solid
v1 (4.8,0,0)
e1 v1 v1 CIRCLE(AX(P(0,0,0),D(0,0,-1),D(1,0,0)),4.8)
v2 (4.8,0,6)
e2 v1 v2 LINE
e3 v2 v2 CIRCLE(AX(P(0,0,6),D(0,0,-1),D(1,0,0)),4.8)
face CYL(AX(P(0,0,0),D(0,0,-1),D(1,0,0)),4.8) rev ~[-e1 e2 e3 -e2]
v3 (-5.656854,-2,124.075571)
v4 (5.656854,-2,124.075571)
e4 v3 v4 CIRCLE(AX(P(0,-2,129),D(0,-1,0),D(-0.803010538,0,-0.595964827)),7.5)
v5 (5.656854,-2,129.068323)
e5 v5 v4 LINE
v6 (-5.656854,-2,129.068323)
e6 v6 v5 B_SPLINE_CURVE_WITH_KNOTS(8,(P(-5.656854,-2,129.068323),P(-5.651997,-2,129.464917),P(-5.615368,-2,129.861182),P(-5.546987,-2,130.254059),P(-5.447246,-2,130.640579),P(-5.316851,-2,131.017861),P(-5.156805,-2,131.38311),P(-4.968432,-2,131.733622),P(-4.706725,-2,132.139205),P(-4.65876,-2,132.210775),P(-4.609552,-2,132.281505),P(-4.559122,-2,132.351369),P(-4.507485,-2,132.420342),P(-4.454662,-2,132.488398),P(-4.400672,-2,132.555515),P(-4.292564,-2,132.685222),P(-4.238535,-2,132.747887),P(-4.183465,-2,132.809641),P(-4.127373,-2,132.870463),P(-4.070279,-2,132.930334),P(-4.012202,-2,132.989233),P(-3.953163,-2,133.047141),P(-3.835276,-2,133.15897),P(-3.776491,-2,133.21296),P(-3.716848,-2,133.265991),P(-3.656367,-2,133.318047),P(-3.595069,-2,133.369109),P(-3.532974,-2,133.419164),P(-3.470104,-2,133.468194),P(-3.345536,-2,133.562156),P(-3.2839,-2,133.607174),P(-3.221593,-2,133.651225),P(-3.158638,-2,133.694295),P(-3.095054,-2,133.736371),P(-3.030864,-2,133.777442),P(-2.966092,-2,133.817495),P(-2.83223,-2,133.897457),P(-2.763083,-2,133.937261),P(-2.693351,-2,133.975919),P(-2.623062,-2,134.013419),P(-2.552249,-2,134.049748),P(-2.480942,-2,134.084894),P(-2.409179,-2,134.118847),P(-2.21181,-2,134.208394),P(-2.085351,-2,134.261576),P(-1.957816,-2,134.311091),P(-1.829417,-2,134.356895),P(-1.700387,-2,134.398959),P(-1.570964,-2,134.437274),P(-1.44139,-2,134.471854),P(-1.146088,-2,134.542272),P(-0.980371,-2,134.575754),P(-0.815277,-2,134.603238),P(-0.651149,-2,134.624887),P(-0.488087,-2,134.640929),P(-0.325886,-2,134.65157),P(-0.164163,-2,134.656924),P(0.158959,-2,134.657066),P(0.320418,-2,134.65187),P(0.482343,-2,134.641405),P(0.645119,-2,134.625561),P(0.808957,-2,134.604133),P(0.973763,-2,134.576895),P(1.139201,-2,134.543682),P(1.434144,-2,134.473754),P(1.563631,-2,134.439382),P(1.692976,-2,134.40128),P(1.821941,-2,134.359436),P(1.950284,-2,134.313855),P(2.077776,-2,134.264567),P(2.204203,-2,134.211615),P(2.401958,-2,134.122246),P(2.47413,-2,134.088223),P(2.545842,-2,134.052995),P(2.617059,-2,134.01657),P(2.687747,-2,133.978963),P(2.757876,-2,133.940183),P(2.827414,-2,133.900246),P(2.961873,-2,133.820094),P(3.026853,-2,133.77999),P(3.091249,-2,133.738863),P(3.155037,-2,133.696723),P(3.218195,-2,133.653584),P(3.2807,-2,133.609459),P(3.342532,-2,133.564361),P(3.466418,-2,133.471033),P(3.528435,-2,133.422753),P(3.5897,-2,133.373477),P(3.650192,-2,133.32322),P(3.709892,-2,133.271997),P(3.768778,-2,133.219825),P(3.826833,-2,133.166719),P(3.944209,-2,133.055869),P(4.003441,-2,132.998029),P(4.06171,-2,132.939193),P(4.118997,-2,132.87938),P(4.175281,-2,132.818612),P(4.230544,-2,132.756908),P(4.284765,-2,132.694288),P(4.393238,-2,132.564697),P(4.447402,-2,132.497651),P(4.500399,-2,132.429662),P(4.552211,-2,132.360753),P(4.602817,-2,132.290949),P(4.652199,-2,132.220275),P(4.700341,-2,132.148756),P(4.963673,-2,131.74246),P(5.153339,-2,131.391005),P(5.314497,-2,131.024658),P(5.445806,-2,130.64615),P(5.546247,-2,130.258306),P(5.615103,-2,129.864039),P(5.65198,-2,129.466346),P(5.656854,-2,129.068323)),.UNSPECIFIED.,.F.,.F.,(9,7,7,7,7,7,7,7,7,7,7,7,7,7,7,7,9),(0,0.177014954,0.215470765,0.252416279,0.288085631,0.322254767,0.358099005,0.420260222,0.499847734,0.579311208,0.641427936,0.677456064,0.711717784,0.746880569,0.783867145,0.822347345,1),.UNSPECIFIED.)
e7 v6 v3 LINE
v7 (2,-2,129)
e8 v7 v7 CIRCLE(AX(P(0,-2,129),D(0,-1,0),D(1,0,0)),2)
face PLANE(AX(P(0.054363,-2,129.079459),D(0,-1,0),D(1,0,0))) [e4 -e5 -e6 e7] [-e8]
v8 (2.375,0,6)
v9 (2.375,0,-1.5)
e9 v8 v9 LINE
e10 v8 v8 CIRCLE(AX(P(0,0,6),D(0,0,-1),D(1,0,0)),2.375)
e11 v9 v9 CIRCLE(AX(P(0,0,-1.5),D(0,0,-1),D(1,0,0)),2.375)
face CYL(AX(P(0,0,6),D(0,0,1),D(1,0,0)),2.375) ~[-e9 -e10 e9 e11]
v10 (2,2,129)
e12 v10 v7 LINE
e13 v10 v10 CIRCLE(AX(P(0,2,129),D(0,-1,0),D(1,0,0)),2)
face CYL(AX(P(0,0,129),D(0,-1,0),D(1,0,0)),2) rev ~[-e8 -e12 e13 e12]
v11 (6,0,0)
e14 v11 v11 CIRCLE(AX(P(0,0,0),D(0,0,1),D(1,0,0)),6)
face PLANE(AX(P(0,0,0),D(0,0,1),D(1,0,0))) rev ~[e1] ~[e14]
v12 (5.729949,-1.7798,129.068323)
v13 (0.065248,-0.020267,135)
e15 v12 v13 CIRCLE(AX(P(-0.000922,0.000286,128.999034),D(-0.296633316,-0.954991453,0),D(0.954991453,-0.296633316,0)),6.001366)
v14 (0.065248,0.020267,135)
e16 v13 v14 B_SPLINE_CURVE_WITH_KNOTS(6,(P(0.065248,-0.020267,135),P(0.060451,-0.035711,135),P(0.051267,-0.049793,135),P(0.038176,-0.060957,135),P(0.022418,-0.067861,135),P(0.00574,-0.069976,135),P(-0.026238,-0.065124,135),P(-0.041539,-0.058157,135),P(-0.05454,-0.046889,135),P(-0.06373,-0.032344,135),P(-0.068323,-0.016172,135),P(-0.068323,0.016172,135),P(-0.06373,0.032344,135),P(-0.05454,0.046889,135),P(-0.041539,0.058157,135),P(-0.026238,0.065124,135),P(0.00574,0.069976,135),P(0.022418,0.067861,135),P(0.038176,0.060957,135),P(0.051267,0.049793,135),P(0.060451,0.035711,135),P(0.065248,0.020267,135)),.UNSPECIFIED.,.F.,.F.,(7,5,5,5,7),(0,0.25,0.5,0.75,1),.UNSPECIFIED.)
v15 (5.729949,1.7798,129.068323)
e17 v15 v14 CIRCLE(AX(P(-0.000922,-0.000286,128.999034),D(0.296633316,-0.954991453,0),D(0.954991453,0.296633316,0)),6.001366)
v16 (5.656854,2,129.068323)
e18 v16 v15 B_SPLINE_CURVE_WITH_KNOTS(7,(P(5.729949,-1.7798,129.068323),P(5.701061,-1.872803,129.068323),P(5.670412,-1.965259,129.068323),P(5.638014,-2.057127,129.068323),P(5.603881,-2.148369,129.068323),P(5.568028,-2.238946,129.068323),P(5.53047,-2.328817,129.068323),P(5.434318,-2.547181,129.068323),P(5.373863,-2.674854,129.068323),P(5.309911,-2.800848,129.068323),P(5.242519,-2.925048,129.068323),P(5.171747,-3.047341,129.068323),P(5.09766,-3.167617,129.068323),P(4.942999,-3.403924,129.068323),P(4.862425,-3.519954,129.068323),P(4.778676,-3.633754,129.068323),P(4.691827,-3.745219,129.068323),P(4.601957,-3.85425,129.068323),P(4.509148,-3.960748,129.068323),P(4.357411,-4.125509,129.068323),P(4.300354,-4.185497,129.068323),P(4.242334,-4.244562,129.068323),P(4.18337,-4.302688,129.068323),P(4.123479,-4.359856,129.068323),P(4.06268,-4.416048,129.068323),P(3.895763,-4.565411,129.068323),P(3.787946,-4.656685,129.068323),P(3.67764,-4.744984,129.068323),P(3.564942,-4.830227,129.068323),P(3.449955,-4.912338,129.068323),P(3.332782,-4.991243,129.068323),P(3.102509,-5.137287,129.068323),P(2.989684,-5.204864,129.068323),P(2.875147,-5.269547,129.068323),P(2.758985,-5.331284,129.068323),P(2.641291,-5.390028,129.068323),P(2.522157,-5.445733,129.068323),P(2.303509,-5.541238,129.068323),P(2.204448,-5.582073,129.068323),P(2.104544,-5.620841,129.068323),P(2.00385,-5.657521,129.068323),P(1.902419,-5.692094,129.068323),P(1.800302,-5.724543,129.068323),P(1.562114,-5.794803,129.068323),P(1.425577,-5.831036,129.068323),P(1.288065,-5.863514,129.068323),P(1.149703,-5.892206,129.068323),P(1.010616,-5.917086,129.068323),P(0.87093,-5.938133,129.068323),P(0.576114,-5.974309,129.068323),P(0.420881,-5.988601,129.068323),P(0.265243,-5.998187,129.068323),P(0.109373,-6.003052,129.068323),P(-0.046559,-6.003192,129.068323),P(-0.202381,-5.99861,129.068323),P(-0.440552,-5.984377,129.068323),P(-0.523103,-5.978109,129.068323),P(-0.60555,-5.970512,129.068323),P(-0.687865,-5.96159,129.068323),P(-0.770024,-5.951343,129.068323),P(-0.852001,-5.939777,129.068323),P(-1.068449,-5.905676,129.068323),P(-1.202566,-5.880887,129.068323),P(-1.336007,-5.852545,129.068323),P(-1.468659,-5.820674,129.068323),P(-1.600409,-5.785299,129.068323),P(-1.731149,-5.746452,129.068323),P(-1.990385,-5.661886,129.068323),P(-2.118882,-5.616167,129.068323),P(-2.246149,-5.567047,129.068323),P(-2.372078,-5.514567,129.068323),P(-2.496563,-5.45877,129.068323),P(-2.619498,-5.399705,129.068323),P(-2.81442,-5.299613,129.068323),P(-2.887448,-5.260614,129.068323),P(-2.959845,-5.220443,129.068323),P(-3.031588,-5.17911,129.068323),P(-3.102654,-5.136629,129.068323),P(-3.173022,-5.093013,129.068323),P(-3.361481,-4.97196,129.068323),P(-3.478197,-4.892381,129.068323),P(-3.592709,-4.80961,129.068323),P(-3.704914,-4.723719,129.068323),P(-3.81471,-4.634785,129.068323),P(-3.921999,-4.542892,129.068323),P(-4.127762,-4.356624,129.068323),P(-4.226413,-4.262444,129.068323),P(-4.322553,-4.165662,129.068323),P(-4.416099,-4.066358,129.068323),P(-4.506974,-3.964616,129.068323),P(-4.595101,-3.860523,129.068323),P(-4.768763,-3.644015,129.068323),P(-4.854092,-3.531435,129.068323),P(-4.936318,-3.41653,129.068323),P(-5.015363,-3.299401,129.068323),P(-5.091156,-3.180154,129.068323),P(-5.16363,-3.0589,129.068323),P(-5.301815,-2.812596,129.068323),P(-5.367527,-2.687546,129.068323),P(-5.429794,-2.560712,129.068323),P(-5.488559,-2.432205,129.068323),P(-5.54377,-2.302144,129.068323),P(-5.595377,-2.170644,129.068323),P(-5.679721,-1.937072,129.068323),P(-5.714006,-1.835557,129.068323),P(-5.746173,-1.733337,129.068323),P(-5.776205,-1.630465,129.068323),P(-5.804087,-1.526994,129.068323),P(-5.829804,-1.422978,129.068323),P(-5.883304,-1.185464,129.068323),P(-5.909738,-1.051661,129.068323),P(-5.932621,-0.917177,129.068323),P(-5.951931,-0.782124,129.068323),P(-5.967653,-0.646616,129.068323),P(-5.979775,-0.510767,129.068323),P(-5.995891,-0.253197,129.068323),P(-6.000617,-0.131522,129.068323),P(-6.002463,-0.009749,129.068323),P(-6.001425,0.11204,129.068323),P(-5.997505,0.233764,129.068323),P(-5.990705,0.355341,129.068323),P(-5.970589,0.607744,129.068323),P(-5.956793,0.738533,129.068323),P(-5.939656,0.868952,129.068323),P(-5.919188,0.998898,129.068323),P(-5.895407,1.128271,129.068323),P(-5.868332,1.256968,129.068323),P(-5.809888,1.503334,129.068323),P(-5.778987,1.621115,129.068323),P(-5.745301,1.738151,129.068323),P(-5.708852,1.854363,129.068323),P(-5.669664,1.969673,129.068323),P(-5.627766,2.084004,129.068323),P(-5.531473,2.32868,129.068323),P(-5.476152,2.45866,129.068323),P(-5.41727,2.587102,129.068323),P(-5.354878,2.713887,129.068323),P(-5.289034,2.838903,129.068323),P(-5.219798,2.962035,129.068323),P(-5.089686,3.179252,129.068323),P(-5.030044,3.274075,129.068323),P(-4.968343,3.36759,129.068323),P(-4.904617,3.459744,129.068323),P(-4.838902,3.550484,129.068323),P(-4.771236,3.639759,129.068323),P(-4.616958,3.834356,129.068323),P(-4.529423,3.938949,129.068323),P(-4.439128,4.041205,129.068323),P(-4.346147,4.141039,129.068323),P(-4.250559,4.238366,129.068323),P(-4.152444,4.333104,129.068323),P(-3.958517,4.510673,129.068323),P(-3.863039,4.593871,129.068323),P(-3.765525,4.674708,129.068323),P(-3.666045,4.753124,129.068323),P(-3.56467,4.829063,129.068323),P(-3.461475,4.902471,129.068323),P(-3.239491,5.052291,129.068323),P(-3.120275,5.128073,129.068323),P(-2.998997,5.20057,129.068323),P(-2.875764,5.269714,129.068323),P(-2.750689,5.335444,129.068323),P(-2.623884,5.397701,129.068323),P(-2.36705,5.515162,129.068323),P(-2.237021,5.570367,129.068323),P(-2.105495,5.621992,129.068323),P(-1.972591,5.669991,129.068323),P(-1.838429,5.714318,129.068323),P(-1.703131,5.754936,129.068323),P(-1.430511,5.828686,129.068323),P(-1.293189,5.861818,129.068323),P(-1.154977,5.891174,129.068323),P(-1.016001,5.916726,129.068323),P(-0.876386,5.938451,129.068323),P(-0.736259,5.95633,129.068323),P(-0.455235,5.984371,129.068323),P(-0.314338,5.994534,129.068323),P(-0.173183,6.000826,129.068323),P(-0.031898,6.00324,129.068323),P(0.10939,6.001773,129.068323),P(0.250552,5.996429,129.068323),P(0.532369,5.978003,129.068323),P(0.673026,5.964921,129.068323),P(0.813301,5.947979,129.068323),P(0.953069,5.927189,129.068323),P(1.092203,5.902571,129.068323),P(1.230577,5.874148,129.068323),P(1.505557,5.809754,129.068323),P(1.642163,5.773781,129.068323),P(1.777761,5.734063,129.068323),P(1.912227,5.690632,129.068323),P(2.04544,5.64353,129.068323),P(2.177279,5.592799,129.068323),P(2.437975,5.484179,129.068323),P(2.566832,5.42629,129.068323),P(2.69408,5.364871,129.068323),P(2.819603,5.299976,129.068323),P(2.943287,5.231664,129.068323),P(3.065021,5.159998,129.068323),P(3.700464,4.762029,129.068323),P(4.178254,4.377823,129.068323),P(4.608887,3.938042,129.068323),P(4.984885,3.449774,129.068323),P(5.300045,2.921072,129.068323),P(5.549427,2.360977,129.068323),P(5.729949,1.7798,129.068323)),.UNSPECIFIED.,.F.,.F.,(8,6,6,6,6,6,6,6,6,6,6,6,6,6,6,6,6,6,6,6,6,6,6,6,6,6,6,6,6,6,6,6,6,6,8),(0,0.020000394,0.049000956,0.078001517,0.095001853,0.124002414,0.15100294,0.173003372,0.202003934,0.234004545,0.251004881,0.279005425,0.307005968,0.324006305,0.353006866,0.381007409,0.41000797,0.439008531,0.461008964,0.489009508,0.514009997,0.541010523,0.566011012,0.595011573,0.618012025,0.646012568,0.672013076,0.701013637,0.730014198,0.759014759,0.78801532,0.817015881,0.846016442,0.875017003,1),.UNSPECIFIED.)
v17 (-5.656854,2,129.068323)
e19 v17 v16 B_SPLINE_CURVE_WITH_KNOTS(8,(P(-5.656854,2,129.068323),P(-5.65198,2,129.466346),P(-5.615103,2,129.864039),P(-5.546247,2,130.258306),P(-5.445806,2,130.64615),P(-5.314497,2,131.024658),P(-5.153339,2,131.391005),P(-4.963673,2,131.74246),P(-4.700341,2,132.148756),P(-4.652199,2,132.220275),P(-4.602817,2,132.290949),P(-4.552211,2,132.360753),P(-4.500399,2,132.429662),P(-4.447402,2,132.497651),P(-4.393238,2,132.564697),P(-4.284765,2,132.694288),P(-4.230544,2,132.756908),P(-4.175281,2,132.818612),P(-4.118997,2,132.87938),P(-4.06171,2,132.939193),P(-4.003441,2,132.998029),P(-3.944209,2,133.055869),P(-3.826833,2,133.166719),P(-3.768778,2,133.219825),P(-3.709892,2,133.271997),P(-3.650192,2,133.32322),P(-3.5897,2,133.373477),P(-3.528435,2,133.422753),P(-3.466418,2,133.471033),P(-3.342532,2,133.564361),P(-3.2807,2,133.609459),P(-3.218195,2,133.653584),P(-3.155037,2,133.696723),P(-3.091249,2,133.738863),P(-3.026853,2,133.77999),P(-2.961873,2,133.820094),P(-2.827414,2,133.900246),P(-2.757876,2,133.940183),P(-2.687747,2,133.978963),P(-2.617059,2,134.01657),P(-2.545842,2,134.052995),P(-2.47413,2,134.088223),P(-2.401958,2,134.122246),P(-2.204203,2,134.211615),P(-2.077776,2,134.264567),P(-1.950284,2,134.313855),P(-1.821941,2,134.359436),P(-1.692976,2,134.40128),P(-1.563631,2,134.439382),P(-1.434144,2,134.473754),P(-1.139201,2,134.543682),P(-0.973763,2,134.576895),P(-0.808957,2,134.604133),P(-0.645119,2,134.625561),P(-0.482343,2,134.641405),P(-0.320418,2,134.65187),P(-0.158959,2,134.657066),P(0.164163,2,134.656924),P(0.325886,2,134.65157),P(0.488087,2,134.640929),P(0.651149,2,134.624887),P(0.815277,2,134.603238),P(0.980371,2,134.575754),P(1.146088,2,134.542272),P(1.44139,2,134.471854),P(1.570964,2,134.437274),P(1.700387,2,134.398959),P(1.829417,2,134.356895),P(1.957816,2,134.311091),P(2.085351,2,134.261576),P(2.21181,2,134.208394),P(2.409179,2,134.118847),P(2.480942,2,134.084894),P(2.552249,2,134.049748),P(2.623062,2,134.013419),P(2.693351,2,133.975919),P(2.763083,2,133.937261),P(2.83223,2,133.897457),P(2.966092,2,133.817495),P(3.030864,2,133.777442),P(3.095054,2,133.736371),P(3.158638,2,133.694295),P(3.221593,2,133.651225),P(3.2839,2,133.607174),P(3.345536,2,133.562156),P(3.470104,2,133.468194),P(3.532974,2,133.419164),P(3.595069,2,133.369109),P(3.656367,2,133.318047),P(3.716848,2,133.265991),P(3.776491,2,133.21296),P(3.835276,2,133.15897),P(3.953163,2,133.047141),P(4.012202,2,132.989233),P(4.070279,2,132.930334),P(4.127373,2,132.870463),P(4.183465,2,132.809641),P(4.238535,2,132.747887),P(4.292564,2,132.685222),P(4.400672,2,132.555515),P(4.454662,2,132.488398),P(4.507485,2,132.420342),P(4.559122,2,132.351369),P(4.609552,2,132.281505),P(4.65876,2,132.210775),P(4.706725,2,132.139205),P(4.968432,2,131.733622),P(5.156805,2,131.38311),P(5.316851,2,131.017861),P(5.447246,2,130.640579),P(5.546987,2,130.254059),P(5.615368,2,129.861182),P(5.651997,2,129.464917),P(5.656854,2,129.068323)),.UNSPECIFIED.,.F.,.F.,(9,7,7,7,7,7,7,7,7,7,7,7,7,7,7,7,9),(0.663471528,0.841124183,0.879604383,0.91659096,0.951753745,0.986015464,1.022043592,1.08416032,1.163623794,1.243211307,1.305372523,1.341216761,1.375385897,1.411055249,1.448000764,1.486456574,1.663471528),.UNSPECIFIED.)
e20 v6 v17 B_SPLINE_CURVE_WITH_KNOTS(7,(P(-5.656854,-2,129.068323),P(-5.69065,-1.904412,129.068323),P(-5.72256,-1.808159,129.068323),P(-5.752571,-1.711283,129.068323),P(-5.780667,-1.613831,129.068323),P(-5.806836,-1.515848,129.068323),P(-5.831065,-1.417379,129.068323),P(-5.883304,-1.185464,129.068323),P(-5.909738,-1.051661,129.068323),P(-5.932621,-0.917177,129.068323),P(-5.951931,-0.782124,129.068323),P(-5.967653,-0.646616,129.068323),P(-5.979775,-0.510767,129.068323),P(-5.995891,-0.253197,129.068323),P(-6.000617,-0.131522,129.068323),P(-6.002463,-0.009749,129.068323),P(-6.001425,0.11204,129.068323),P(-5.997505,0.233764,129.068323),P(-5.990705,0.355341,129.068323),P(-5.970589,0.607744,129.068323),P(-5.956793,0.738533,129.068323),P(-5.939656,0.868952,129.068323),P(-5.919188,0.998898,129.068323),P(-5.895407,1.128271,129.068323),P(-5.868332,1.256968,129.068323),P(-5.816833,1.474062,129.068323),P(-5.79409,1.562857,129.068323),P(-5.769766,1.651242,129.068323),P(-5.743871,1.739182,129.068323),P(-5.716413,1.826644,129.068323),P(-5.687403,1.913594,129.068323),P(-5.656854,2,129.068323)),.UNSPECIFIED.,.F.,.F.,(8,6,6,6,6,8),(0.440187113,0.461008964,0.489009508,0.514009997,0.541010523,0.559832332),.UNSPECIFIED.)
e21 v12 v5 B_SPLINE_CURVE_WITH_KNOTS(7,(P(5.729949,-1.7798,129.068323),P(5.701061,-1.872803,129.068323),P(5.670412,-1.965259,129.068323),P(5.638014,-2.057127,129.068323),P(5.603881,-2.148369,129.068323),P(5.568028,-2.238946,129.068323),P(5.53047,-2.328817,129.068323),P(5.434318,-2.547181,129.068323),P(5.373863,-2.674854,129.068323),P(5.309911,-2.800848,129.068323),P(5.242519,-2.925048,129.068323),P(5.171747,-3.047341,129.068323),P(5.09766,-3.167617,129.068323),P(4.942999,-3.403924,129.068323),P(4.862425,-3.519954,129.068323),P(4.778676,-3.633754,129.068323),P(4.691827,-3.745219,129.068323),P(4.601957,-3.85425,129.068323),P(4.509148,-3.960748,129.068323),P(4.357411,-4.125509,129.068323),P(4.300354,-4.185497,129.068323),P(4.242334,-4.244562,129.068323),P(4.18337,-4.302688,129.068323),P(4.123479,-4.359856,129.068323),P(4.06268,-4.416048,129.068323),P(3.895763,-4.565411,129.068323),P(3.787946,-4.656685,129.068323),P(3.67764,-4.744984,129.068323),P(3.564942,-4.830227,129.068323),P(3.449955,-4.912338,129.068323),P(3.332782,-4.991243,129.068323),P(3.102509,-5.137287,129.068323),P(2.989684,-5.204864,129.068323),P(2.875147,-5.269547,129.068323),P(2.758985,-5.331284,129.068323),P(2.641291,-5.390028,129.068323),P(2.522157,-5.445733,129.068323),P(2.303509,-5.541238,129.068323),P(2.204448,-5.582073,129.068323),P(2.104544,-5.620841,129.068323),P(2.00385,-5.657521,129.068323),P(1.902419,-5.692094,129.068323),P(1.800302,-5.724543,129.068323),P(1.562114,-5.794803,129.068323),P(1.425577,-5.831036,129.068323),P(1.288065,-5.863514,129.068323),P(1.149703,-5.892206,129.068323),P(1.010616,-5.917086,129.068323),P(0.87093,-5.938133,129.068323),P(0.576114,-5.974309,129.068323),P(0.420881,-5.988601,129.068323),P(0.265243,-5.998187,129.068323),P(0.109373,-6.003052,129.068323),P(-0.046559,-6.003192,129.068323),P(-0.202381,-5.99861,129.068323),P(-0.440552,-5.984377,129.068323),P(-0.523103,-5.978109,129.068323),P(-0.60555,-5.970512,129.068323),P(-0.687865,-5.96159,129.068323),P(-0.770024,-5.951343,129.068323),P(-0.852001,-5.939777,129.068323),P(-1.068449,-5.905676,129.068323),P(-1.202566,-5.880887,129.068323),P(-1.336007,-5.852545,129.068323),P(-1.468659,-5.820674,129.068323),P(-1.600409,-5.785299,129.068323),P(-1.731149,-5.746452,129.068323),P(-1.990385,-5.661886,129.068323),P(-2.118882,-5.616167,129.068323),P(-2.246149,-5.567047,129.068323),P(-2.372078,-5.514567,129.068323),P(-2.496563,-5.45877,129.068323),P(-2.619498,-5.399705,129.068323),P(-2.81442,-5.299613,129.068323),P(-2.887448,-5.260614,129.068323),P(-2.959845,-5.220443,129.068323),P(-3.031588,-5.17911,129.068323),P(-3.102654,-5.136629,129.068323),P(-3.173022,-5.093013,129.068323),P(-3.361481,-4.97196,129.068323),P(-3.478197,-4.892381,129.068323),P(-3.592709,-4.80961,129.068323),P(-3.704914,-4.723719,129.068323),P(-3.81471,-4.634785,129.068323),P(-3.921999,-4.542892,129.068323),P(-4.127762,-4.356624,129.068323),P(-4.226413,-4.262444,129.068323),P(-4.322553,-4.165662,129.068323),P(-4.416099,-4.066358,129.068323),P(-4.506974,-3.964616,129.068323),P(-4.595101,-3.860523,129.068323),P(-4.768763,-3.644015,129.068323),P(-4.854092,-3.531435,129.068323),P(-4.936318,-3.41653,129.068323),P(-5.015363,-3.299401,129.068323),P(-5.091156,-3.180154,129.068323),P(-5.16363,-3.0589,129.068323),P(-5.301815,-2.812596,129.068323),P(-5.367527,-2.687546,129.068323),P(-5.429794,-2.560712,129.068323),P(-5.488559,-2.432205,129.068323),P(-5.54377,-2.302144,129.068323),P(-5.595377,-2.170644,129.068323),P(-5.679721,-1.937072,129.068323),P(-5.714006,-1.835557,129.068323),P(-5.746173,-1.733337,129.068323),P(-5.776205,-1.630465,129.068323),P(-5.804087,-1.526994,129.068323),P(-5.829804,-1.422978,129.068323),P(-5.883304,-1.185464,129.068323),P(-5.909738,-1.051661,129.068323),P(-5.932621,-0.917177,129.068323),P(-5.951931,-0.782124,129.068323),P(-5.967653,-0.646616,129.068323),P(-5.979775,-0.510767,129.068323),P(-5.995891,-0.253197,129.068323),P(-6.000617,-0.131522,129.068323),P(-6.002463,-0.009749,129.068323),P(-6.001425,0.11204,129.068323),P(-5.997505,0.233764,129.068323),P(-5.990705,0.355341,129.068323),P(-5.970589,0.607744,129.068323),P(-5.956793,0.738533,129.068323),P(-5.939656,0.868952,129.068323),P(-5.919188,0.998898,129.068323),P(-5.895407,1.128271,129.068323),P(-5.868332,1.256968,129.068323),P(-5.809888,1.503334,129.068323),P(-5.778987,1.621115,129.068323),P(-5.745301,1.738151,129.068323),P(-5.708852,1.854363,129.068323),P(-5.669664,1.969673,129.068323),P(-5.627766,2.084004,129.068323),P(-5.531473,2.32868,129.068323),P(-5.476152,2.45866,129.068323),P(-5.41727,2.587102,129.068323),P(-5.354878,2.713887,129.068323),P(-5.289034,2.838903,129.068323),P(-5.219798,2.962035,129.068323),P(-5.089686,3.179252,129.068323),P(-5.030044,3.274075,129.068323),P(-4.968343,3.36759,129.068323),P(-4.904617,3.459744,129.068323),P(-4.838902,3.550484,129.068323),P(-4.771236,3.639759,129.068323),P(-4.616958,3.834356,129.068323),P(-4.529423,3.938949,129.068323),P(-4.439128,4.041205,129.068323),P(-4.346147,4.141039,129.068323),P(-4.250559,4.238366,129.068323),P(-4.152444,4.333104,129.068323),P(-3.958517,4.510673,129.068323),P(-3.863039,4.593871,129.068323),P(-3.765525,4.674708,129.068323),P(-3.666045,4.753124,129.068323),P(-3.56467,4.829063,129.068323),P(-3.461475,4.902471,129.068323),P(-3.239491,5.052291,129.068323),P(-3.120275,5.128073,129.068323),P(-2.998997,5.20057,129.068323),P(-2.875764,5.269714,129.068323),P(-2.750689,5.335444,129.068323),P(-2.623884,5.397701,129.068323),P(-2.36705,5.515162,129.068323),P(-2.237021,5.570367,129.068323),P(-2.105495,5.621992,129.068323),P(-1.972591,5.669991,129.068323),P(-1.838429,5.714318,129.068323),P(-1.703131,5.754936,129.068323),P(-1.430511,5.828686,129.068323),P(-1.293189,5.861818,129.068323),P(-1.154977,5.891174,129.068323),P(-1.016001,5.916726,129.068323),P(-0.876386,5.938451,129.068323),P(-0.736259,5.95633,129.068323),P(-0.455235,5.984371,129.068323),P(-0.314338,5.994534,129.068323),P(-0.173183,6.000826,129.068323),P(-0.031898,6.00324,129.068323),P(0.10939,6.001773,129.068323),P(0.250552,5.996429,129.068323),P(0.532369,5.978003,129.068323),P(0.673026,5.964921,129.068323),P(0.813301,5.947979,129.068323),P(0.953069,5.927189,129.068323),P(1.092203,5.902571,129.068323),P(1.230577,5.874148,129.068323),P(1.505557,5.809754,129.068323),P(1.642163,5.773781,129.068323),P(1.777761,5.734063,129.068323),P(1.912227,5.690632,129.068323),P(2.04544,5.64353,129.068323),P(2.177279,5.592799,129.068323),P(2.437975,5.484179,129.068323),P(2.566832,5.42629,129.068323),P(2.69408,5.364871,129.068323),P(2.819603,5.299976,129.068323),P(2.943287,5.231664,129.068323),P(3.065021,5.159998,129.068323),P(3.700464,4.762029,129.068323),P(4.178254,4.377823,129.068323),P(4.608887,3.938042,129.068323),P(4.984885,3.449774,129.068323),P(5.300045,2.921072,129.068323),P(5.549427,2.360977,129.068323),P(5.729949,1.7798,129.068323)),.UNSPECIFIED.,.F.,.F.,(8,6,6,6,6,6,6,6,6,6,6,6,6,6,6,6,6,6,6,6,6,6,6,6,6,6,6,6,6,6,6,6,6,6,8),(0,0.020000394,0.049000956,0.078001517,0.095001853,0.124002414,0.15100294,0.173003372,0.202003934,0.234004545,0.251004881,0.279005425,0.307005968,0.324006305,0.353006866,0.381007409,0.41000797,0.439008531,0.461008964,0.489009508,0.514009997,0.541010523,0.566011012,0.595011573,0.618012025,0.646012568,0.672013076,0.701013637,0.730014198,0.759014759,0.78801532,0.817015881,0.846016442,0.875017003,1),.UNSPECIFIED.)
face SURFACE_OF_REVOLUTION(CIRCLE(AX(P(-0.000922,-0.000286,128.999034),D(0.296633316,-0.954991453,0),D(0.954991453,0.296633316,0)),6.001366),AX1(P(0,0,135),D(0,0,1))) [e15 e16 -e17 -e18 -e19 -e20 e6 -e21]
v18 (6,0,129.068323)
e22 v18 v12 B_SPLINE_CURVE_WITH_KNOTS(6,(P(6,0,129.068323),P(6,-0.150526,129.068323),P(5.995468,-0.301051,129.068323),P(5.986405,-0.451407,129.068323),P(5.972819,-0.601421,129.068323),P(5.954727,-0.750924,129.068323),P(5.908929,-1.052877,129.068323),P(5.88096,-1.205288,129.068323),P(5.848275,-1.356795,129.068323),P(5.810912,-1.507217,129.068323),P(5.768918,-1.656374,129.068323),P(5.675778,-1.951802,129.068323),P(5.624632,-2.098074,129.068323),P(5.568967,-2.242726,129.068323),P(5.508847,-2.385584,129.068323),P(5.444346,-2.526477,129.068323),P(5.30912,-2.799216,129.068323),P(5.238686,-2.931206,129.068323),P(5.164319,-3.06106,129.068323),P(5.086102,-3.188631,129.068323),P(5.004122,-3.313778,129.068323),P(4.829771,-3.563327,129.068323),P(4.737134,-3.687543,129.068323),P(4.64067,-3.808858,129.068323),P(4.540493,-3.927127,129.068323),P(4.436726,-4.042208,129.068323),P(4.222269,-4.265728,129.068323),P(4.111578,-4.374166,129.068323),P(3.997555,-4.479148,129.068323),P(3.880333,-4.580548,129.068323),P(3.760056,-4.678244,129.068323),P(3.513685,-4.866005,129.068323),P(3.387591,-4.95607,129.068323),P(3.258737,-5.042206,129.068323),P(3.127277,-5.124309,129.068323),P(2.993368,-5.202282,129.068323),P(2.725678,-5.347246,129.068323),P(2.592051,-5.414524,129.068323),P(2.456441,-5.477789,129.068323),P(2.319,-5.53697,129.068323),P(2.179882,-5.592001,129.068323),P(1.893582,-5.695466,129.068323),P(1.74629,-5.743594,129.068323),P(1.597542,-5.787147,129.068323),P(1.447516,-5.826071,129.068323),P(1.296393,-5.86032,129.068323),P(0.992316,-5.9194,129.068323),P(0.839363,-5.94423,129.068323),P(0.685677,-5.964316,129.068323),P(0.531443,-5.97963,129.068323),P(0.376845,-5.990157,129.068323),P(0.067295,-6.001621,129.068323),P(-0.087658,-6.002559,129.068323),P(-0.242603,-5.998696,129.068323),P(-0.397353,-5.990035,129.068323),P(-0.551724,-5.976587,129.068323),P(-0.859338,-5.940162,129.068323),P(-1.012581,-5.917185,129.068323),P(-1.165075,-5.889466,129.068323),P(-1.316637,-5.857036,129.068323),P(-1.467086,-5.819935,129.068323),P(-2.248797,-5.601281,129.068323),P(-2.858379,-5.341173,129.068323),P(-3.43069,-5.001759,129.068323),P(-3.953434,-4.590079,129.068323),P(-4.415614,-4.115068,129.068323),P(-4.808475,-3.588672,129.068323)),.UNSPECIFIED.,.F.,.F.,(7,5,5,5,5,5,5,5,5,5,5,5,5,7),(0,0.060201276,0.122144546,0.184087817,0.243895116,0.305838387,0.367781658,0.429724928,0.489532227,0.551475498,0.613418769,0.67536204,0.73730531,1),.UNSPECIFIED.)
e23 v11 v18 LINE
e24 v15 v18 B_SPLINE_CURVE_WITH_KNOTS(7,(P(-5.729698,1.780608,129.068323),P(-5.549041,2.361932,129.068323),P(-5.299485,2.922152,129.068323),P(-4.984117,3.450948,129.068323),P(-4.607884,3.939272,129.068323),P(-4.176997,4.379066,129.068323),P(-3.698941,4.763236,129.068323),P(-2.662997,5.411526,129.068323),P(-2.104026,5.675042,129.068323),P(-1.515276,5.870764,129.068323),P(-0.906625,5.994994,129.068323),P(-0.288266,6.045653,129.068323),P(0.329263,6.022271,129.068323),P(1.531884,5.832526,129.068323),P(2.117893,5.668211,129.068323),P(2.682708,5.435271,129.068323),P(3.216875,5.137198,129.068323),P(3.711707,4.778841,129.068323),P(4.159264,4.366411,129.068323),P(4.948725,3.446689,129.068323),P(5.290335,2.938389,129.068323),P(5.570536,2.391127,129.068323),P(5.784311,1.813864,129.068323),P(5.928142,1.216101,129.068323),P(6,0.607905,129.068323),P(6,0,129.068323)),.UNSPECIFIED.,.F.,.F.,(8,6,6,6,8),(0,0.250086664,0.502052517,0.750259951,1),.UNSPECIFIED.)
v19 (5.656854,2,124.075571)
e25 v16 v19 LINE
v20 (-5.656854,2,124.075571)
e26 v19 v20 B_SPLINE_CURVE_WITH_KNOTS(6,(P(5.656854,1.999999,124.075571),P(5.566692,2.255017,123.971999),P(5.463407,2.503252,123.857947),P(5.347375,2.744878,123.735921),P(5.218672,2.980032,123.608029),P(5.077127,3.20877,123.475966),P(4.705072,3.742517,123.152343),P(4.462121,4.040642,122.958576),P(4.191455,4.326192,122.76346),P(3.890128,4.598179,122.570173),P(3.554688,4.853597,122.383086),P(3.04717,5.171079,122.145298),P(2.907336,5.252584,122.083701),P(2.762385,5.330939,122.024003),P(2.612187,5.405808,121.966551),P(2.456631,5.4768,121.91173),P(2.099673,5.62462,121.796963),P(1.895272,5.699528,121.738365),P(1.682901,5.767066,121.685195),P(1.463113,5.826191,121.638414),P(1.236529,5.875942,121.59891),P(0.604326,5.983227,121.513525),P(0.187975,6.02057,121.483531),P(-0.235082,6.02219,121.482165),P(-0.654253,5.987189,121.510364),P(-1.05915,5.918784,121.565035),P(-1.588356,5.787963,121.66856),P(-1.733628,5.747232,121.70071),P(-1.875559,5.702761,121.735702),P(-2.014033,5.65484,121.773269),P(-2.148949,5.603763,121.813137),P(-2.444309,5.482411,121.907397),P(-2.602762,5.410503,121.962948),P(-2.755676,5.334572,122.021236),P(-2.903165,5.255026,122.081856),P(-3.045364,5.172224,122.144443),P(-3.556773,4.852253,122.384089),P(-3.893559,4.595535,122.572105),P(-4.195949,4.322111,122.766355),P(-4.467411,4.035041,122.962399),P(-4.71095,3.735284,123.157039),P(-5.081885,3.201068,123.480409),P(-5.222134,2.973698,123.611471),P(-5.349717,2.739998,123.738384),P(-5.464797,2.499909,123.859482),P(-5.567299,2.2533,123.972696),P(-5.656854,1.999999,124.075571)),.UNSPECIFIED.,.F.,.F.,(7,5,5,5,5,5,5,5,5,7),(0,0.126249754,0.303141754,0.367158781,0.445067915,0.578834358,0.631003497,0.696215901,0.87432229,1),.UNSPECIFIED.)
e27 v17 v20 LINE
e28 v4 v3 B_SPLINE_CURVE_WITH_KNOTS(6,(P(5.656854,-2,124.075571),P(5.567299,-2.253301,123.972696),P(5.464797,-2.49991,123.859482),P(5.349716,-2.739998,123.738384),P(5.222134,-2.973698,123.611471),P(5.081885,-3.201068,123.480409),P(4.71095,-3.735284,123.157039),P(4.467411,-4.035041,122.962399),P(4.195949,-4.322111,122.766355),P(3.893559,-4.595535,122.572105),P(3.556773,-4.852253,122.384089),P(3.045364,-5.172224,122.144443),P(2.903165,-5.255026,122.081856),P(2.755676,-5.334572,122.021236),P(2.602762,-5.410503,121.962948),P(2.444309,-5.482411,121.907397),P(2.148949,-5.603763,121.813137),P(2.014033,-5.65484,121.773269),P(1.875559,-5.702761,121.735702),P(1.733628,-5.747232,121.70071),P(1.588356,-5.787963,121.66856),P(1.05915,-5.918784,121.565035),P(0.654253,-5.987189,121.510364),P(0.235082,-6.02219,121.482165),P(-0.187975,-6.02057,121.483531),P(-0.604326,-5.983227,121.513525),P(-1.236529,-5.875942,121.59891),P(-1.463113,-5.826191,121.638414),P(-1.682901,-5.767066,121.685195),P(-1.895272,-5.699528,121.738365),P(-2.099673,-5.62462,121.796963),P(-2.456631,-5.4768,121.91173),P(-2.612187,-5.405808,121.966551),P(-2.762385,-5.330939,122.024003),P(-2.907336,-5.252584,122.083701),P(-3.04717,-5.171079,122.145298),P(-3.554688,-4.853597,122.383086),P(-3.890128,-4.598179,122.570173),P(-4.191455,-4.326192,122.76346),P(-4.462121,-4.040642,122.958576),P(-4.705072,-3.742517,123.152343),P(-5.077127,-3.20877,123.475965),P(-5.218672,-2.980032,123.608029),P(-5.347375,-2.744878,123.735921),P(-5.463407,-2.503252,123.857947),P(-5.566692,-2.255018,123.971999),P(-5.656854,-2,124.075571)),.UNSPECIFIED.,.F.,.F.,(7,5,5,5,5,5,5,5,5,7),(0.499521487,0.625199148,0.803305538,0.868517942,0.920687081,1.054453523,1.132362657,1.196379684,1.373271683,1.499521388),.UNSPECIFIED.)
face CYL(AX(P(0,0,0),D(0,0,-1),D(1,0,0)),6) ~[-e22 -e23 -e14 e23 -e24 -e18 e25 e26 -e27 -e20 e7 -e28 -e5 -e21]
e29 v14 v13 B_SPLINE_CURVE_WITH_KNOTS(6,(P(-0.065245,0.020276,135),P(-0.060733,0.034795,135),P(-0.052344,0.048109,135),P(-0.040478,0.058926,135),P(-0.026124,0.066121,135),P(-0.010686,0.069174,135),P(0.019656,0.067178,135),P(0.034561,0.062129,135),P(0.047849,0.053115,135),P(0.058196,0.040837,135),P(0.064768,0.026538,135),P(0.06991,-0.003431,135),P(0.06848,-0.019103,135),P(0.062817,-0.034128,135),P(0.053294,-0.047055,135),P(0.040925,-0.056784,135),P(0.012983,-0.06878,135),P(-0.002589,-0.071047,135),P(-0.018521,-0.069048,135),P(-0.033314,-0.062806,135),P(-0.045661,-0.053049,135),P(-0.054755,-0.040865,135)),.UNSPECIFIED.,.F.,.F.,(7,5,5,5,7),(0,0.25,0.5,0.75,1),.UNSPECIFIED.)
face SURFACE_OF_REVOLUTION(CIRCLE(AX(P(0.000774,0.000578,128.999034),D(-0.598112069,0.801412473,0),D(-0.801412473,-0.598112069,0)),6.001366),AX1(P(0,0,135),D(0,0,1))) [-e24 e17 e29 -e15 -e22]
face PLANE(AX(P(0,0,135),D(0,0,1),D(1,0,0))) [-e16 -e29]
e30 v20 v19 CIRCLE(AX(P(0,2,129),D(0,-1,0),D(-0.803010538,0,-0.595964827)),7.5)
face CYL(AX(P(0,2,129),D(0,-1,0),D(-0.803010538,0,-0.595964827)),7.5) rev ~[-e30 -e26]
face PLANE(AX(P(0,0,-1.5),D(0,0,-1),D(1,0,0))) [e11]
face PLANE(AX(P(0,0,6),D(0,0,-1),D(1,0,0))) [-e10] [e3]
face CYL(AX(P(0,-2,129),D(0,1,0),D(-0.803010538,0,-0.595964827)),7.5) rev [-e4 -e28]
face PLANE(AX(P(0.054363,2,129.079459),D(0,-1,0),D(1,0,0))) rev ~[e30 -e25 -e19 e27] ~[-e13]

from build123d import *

# Parameters (mm, degrees)
F0_R        = 6
F1_DEPTH    = 135
F3_START    = -2
F3_DEPTH    = 4.0010001005
F4_START    = 2
F4_DEPTH    = 4
F5_T2_ANGLE = 325.4889919963
F5_T4_ANGLE = 306.0016128171
F5_T6_ANGLE = 306.0016128171
F6_R        = 2
F7_DEPTH    = 12.5
F8_R        = 4.8
F9_DEPTH    = 6
F10_R       = 2.375
F11_DEPTH   = 7.5


# Not quite as in the source:
# - a fillet or chamfer that OpenCascade refuses, or shapes differently, is made with other operations: its cross-section is extruded or revolved along the edge and cut away or added


with BuildPart() as f1:
    # F0 (on Top) → F1 (new body)
    with BuildSketch(Plane.XY):
        Circle(F0_R)
    extrude(amount=F1_DEPTH)

    # F2 (on Front) → F3 (cut)
    with BuildSketch(Plane.XZ.offset(F3_START)):
        with BuildLine():
            Line((-6.0225790367, 135.0244730711), (-6.0225790367, 124.5302637944))
            ThreePointArc((-6.0225790367, 124.5302637944), (0.1221735447, 121.5009951577), (6.1649857089, 124.7288232056))
            Line((6.1649857089, 124.7288232056), (6.1649857089, 135.0244730711))
            Line((6.1649857089, 135.0244730711), (-6.0225790367, 135.0244730711))
        make_face()
    extrude(amount=-F3_DEPTH, mode=Mode.SUBTRACT)

    # F2 (on Front) → F4 (cut)
    with BuildSketch(Plane.XZ.offset(F4_START)):
        with BuildLine():
            Line((-6.0225790367, 135.0244730711), (-6.0225790367, 124.5302637944))
            ThreePointArc((-6.0225790367, 124.5302637944), (0.1221735447, 121.5009951577), (6.1649857089, 124.7288232056))
            Line((6.1649857089, 124.7288232056), (6.1649857089, 135.0244730711))
            Line((6.1649857089, 135.0244730711), (-6.0225790367, 135.0244730711))
        make_face()
    extrude(amount=F4_DEPTH, mode=Mode.SUBTRACT)

    # F5: fillet of radius 6 on 3 edges, made by hand

    # F5_s1 → F5_t2 (revolve, cut)
    with BuildSketch(Plane(origin=(0, 0, 0), x_dir=(0, 0, 1), z_dir=(0.2966333156, -0.9549914534, 0))):
        with BuildLine():
            ThreePointArc((128.9990343146, -6.0004), (133.242299252, -4.2429820947), (135.0003999223, 0))
            Line((135.0003999223, 0), (135.6005365042, 0))
            Line((135.6005365042, 0), (135.6001365685, -6))
            Line((135.6001365685, -6), (135, -6.6001365685))
            ThreePointArc((135, -6.6001365685), (131.9995171573, -6.6001365685), (128.9990343146, -6.6005365685))
            Line((128.9990343146, -6.6005365685), (128.9990343146, -6.0004))
        make_face()
    revolve(axis=Axis((0, 0, 135), (0, 0, 1)), revolution_arc=F5_T2_ANGLE, mode=Mode.SUBTRACT)

    # F5_s3 → F5_t4 (revolve, cut)
    with BuildSketch(Plane(origin=(0, 0, 0), x_dir=(0, 0, 1), z_dir=(-0.5981120695, 0.8014124733, 0))):
        with BuildLine():
            ThreePointArc((128.9990343146, -6.0004), (133.242299252, -4.2429820947), (135.0003999223, 0))
            Line((135.0003999223, 0), (135.6005365042, 0))
            Line((135.6005365042, 0), (135.6001365685, -6))
            Line((135.6001365685, -6), (135, -6.6001365685))
            ThreePointArc((135, -6.6001365685), (131.9995171573, -6.6001365685), (128.9990343146, -6.6005365685))
            Line((128.9990343146, -6.6005365685), (128.9990343146, -6.0004))
        make_face()
    revolve(axis=Axis((0, 0, 135), (0, 0, 1)), revolution_arc=F5_T4_ANGLE, mode=Mode.SUBTRACT)

    # F5_s5 → F5_t6 (revolve, cut)
    with BuildSketch(Plane(origin=(0, 0, 0), x_dir=(0, 0, 1), z_dir=(-0.2967679759, 0.9549496157, 0))):
        with BuildLine():
            ThreePointArc((128.9990343146, -6.0004), (133.242299252, -4.2429820947), (135.0003999223, 0))
            Line((135.0003999223, 0), (135.6005365042, 0))
            Line((135.6005365042, 0), (135.6001365685, -6))
            Line((135.6001365685, -6), (135, -6.6001365685))
            ThreePointArc((135, -6.6001365685), (131.9995171573, -6.6001365685), (128.9990343146, -6.6005365685))
            Line((128.9990343146, -6.6005365685), (128.9990343146, -6.0004))
        make_face()
    revolve(axis=Axis((0, 0, 135), (0, 0, 1)), revolution_arc=F5_T6_ANGLE, mode=Mode.SUBTRACT)

    # F6 (on face) → F7 (cut, symmetric)
    with BuildSketch(Plane.XZ):
        with Locations((0, 129)):
            Circle(F6_R)
    extrude(amount=F7_DEPTH, both=True, mode=Mode.SUBTRACT)

    # F8 (on face) → F9 (cut)
    with BuildSketch(Plane(origin=(0, 0, 0), x_dir=(1, 0, 0), z_dir=(0, 0, -1))):
        Circle(F8_R)
    extrude(amount=-F9_DEPTH, mode=Mode.SUBTRACT)

    # F10 (on face) → F11 (join)
    with BuildSketch(Plane(origin=(0, 0, 6), x_dir=(1, 0, 0), z_dir=(0, 0, -1))):
        Circle(F10_R)
    extrude(amount=F11_DEPTH)


solid = f1.part
